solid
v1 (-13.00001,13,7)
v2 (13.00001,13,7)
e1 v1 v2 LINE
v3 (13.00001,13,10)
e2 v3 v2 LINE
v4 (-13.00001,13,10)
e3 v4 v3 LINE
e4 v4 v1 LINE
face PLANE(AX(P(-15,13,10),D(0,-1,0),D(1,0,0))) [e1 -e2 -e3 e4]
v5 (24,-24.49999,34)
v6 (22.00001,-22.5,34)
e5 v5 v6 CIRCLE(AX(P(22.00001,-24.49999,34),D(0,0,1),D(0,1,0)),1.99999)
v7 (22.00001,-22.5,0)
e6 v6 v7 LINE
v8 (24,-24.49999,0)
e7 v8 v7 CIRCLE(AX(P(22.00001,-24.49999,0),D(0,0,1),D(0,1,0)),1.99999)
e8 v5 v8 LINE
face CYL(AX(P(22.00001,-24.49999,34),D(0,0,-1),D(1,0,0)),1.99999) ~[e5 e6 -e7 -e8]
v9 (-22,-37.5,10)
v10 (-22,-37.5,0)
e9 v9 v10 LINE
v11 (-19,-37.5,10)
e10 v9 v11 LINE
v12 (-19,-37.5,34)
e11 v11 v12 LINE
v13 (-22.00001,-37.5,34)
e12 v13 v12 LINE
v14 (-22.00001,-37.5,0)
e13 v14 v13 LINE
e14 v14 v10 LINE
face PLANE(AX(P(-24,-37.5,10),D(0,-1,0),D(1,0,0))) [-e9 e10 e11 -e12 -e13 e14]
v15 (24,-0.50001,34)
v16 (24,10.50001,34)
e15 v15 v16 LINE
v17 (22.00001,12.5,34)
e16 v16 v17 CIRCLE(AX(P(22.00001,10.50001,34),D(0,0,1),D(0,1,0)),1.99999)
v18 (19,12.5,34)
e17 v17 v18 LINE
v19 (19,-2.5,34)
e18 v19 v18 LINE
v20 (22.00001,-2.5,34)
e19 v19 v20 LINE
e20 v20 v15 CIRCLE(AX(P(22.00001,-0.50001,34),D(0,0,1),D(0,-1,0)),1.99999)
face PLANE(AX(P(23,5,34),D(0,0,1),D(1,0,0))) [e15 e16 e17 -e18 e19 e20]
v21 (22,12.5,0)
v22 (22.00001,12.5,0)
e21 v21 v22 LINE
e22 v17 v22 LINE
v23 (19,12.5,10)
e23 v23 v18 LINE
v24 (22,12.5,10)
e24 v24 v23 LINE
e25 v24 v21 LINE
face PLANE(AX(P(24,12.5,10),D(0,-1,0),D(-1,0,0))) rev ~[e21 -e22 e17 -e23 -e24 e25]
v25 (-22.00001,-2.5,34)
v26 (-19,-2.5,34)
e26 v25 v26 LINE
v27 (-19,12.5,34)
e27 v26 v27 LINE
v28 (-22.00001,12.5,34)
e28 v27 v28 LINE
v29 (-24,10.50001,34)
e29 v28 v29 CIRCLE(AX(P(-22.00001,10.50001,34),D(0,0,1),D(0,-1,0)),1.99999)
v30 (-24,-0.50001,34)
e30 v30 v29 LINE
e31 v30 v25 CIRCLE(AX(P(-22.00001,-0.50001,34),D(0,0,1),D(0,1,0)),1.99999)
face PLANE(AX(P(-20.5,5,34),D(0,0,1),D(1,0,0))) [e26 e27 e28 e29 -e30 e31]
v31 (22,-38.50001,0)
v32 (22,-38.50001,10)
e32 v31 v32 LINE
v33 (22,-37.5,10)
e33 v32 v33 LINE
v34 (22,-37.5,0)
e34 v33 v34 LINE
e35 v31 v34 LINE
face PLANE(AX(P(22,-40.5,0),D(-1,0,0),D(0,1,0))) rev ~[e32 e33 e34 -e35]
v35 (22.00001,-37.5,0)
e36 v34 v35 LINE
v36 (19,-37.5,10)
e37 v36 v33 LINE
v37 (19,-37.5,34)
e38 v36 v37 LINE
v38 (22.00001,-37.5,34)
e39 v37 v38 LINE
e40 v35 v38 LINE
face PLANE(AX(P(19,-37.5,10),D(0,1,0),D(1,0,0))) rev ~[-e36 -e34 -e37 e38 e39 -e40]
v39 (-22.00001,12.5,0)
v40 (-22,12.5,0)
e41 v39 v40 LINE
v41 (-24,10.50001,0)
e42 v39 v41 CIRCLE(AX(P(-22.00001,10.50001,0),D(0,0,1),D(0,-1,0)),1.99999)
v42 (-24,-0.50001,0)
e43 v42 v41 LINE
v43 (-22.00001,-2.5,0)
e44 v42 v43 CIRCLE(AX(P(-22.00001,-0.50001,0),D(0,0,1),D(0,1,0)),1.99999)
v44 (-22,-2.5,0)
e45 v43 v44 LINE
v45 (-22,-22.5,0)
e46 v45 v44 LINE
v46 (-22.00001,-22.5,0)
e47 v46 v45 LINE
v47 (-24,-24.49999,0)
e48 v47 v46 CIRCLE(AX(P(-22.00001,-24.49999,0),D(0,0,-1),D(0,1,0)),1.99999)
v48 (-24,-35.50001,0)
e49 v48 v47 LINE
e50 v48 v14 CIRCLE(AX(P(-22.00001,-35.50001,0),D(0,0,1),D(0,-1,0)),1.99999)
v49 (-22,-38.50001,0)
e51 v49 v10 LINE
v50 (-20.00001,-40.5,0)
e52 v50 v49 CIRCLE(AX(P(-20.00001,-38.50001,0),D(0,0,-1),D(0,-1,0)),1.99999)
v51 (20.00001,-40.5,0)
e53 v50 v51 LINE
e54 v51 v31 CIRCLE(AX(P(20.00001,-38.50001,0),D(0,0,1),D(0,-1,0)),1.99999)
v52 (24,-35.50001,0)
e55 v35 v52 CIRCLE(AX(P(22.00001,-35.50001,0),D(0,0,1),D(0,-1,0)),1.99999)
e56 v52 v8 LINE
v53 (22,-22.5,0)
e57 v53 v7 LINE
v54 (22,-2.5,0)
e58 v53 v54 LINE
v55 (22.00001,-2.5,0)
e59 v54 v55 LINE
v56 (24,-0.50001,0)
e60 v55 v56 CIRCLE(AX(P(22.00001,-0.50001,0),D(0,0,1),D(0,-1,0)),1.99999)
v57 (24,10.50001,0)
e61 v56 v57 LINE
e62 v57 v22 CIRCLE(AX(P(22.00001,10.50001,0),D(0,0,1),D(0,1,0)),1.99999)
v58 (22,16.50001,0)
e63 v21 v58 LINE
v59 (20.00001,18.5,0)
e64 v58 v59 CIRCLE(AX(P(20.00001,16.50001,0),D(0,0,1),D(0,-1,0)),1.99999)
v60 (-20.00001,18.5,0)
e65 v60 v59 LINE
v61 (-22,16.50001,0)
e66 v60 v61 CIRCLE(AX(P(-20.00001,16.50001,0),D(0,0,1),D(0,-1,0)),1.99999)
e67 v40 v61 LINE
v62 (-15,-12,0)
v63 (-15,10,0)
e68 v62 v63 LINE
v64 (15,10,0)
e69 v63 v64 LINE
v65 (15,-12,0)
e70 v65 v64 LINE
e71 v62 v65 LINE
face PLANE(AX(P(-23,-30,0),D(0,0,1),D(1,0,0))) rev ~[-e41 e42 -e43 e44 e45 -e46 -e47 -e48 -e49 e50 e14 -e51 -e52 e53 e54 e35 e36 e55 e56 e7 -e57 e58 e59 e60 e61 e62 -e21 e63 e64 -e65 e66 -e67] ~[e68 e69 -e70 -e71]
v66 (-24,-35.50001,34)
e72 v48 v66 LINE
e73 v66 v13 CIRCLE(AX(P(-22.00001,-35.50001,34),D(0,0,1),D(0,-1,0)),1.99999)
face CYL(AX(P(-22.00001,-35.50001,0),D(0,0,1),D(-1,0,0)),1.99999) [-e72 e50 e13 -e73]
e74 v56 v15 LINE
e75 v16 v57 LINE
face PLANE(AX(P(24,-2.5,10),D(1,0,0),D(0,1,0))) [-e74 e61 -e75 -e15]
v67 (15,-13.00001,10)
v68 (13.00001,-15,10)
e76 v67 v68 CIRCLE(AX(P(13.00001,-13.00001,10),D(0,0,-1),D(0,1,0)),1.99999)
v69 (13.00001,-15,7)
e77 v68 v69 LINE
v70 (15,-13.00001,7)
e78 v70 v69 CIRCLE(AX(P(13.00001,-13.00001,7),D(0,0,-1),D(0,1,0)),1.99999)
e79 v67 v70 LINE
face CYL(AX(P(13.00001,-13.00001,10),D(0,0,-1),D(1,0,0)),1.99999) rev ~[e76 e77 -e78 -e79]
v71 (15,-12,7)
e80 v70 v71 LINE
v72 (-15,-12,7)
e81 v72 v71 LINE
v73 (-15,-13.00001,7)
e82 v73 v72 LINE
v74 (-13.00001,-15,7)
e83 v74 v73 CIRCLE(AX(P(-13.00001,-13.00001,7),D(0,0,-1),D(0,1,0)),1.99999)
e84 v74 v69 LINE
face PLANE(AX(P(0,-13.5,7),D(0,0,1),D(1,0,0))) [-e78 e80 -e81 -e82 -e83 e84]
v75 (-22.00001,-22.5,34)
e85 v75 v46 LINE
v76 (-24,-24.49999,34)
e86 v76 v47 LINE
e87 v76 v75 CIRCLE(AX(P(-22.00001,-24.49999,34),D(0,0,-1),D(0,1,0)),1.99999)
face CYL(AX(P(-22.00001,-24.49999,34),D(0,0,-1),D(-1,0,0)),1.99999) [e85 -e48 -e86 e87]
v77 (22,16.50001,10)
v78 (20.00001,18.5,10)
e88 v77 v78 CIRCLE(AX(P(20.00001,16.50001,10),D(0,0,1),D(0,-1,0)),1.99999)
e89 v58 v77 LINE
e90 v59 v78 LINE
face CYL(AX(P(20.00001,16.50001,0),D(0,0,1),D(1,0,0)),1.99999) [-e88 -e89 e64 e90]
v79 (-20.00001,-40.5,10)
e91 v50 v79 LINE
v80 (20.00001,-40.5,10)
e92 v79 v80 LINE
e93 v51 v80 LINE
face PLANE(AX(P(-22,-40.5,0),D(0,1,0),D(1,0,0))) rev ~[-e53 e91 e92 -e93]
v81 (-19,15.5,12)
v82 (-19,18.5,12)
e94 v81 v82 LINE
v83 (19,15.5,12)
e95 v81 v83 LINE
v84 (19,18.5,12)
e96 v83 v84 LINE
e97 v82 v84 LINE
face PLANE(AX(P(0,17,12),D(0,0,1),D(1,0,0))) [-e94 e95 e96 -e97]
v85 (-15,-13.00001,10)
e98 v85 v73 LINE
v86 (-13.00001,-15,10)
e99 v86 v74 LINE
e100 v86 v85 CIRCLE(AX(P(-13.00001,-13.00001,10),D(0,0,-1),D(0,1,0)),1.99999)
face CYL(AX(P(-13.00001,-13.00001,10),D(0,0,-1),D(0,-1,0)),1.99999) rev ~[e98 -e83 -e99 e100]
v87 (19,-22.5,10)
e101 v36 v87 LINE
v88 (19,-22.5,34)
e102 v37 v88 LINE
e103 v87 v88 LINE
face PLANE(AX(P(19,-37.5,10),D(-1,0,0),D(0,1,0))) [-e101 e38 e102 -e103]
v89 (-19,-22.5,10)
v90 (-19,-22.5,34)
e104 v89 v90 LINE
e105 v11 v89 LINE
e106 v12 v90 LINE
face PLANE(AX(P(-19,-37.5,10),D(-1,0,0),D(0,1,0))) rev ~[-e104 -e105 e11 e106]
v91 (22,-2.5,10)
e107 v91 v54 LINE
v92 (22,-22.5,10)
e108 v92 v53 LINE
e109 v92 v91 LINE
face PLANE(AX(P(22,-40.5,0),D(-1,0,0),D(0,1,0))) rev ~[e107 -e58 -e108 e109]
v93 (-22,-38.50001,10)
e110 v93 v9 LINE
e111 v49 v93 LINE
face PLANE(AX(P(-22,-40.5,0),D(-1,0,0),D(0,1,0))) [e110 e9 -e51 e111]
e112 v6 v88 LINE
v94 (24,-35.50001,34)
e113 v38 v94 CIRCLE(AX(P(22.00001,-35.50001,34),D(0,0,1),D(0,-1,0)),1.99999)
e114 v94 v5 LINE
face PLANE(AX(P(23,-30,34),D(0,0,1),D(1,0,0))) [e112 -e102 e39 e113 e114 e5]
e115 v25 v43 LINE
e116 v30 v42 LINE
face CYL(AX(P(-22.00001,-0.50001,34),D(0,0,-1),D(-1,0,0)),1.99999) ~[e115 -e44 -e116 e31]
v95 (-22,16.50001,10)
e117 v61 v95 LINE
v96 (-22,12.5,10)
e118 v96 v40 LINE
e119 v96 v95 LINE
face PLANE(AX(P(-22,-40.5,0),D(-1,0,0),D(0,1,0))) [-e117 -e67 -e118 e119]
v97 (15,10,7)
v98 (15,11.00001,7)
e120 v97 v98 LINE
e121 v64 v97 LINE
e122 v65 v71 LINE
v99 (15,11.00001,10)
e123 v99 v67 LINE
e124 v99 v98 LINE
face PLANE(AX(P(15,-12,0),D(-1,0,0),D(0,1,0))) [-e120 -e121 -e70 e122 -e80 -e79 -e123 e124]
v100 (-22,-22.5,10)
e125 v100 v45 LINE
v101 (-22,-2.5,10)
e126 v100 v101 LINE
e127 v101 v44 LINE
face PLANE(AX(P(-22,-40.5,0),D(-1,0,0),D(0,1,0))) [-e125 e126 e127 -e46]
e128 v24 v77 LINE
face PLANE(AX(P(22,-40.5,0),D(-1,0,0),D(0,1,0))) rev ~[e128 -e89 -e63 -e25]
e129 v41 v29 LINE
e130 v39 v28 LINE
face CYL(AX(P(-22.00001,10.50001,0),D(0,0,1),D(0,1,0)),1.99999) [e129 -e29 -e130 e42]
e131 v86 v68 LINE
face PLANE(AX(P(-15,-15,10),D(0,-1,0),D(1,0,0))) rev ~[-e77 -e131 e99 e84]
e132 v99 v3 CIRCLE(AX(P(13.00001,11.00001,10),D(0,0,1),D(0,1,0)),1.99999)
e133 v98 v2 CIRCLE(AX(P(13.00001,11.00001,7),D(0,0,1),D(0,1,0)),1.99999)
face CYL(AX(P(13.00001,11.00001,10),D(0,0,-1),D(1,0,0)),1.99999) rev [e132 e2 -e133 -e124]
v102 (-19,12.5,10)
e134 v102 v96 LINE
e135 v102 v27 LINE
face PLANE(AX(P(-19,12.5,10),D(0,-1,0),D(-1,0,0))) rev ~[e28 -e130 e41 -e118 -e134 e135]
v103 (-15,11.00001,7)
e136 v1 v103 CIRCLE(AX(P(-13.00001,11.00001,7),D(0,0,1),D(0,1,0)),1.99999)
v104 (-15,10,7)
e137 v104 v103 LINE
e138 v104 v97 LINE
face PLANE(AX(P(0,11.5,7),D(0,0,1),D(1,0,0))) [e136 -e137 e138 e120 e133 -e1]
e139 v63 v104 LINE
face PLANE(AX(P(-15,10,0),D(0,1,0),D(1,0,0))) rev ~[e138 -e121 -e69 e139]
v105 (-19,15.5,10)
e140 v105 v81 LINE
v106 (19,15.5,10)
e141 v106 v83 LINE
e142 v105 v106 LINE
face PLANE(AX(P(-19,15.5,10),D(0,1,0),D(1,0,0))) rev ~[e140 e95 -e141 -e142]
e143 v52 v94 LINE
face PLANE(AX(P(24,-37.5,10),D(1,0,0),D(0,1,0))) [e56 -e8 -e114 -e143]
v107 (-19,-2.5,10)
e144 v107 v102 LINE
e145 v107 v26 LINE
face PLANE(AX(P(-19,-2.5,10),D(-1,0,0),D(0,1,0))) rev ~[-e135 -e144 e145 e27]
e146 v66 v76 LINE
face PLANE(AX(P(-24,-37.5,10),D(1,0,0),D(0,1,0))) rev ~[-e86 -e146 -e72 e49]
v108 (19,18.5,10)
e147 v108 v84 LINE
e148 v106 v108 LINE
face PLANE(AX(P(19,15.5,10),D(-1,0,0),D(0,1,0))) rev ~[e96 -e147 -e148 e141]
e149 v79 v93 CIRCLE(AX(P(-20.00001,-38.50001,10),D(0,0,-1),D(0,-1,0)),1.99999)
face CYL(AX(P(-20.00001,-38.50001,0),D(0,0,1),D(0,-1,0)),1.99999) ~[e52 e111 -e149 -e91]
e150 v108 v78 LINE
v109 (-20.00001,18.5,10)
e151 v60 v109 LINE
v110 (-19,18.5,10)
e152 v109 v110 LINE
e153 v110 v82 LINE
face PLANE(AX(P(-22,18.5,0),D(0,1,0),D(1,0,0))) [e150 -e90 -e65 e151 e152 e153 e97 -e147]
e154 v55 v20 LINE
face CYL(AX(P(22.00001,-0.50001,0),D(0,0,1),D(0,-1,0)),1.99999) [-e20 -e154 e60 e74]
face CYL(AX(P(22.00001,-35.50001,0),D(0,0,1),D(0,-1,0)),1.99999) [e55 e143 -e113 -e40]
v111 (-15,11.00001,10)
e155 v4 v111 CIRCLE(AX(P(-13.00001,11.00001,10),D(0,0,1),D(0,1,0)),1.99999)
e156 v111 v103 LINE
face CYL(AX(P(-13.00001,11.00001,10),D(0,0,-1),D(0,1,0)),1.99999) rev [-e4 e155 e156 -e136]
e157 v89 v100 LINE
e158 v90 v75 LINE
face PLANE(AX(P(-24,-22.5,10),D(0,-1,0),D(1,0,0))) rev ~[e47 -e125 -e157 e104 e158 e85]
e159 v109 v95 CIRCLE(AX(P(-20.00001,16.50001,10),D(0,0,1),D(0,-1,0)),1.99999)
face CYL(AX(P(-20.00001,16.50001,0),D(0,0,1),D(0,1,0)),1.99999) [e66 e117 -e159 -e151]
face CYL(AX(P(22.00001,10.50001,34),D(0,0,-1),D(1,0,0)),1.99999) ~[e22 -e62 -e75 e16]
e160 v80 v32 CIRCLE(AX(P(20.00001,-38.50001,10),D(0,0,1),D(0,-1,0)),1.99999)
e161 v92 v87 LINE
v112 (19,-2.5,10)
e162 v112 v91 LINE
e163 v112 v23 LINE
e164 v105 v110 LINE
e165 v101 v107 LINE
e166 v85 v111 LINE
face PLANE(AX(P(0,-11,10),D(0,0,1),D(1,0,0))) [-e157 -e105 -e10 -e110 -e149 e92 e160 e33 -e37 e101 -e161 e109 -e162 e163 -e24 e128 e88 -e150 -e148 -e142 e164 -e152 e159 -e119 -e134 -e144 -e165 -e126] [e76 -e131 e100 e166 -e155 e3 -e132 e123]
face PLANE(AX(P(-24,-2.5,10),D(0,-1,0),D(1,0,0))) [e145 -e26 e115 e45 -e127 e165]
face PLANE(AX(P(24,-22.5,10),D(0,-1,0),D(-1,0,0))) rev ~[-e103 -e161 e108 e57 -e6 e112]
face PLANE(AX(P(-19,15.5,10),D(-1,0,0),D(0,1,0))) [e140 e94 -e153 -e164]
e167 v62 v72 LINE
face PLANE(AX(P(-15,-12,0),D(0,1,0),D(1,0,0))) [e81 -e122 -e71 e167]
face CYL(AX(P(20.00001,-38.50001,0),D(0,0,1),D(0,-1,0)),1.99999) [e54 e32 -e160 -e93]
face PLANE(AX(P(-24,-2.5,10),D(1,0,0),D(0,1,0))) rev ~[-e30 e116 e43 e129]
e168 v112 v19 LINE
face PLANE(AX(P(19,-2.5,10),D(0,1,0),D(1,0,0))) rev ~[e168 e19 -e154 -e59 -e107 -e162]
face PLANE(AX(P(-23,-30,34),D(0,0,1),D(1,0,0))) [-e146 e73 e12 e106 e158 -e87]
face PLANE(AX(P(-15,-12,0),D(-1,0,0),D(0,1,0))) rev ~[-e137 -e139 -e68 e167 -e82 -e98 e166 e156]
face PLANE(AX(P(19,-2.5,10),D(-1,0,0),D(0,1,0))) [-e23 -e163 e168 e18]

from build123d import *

# Parameters (mm, degrees)
F0_W     = 44
F0_H     = 59
F0_W_2   = 30
F0_H_2   = 22
F1_DEPTH = 10
F2_W     = 30
F2_H     = 3
F3_DEPTH = 3
F4_W     = 38
F4_H     = 3
F5_DEPTH = 2
F6_W     = 3
F6_H     = 15
F6_W_2   = 2
F7_DEPTH = 24
F8_DEPTH = 10
F9_R     = 1.99999


# Not quite as in the source:
# - a fillet or chamfer is up to 0.001 mm smaller than in the source, because OpenCascade refuses the exact size


with BuildPart() as f1:
    # F0 (on Top) → F1 (new body)
    with BuildSketch(Plane.XY):
        with Locations((0, -11)):
            Rectangle(F0_W, F0_H)
        with Locations((0, -1)):
            Rectangle(F0_W_2, F0_H_2, mode=Mode.SUBTRACT)
    extrude(amount=F1_DEPTH)

    # F2 (on face) → F3 (cut)
    with BuildSketch(Plane.XY.offset(10)):
        with Locations((0, -13.5)):
            Rectangle(F2_W, F2_H)
        with Locations((0, 11.5)):
            Rectangle(F2_W, F2_H)
    extrude(amount=-F3_DEPTH, mode=Mode.SUBTRACT)

    # F4 (on face) → F5 (join)
    with BuildSketch(Plane.XY.offset(10)):
        with Locations((0, 17)):
            Rectangle(F4_W, F4_H)
    extrude(amount=F5_DEPTH)

    # F6 (on face) → F7 (join)
    with BuildSketch(Plane.XY.offset(10)):
        with Locations((-20.5, 5)):
            Rectangle(F6_W, F6_H)
        with Locations((-23, 5)):
            Rectangle(F6_W_2, F6_H)
        with Locations((-23, -30)):
            Rectangle(F6_W_2, F6_H)
        with Locations((-20.5, -30)):
            Rectangle(F6_W, F6_H)
        with Locations((23, 5)):
            Rectangle(F6_W_2, F6_H)
        with Locations((23, -30)):
            Rectangle(F6_W_2, F6_H)
        with Locations((20.5, -30)):
            Rectangle(F6_W, F6_H)
        with Locations((20.5, 5)):
            Rectangle(F6_W, F6_H)
    extrude(amount=F7_DEPTH)

    # F6 (on face) → F8 (join, through all)
    with BuildSketch(Plane.XY.offset(10)):
        with Locations((-23, -30)):
            Rectangle(F6_W_2, F6_H)
        with Locations((-23, 5)):
            Rectangle(F6_W_2, F6_H)
        with Locations((23, -30)):
            Rectangle(F6_W_2, F6_H)
        with Locations((23, 5)):
            Rectangle(F6_W_2, F6_H)
    extrude(amount=-F8_DEPTH)

    # F9 (radius 2 in the source; OpenCascade refuses exactly that, so slightly less here)
    f9_edges = [f1.edges().sort_by_distance(p)[0] for p in [
        (24, 12.5, 17),
        (-24, 12.5, 17),
        (-24, -2.5, 17),
        (-24, -22.5, 17),
        (-24, -37.5, 17),
        (24, -37.5, 17),
        (24, -22.5, 17),
        (22, -40.5, 5),
        (-22, -40.5, 5),
        (22, 18.5, 5),
        (-22, 18.5, 5),
        (24, -2.5, 17),
        (-15, 13, 8.5),
        (15, 13, 8.5),
        (-15, -15, 8.5),
        (15, -15, 8.5),
    ]]
    fillet(f9_edges, radius=F9_R)


solid = f1.part
